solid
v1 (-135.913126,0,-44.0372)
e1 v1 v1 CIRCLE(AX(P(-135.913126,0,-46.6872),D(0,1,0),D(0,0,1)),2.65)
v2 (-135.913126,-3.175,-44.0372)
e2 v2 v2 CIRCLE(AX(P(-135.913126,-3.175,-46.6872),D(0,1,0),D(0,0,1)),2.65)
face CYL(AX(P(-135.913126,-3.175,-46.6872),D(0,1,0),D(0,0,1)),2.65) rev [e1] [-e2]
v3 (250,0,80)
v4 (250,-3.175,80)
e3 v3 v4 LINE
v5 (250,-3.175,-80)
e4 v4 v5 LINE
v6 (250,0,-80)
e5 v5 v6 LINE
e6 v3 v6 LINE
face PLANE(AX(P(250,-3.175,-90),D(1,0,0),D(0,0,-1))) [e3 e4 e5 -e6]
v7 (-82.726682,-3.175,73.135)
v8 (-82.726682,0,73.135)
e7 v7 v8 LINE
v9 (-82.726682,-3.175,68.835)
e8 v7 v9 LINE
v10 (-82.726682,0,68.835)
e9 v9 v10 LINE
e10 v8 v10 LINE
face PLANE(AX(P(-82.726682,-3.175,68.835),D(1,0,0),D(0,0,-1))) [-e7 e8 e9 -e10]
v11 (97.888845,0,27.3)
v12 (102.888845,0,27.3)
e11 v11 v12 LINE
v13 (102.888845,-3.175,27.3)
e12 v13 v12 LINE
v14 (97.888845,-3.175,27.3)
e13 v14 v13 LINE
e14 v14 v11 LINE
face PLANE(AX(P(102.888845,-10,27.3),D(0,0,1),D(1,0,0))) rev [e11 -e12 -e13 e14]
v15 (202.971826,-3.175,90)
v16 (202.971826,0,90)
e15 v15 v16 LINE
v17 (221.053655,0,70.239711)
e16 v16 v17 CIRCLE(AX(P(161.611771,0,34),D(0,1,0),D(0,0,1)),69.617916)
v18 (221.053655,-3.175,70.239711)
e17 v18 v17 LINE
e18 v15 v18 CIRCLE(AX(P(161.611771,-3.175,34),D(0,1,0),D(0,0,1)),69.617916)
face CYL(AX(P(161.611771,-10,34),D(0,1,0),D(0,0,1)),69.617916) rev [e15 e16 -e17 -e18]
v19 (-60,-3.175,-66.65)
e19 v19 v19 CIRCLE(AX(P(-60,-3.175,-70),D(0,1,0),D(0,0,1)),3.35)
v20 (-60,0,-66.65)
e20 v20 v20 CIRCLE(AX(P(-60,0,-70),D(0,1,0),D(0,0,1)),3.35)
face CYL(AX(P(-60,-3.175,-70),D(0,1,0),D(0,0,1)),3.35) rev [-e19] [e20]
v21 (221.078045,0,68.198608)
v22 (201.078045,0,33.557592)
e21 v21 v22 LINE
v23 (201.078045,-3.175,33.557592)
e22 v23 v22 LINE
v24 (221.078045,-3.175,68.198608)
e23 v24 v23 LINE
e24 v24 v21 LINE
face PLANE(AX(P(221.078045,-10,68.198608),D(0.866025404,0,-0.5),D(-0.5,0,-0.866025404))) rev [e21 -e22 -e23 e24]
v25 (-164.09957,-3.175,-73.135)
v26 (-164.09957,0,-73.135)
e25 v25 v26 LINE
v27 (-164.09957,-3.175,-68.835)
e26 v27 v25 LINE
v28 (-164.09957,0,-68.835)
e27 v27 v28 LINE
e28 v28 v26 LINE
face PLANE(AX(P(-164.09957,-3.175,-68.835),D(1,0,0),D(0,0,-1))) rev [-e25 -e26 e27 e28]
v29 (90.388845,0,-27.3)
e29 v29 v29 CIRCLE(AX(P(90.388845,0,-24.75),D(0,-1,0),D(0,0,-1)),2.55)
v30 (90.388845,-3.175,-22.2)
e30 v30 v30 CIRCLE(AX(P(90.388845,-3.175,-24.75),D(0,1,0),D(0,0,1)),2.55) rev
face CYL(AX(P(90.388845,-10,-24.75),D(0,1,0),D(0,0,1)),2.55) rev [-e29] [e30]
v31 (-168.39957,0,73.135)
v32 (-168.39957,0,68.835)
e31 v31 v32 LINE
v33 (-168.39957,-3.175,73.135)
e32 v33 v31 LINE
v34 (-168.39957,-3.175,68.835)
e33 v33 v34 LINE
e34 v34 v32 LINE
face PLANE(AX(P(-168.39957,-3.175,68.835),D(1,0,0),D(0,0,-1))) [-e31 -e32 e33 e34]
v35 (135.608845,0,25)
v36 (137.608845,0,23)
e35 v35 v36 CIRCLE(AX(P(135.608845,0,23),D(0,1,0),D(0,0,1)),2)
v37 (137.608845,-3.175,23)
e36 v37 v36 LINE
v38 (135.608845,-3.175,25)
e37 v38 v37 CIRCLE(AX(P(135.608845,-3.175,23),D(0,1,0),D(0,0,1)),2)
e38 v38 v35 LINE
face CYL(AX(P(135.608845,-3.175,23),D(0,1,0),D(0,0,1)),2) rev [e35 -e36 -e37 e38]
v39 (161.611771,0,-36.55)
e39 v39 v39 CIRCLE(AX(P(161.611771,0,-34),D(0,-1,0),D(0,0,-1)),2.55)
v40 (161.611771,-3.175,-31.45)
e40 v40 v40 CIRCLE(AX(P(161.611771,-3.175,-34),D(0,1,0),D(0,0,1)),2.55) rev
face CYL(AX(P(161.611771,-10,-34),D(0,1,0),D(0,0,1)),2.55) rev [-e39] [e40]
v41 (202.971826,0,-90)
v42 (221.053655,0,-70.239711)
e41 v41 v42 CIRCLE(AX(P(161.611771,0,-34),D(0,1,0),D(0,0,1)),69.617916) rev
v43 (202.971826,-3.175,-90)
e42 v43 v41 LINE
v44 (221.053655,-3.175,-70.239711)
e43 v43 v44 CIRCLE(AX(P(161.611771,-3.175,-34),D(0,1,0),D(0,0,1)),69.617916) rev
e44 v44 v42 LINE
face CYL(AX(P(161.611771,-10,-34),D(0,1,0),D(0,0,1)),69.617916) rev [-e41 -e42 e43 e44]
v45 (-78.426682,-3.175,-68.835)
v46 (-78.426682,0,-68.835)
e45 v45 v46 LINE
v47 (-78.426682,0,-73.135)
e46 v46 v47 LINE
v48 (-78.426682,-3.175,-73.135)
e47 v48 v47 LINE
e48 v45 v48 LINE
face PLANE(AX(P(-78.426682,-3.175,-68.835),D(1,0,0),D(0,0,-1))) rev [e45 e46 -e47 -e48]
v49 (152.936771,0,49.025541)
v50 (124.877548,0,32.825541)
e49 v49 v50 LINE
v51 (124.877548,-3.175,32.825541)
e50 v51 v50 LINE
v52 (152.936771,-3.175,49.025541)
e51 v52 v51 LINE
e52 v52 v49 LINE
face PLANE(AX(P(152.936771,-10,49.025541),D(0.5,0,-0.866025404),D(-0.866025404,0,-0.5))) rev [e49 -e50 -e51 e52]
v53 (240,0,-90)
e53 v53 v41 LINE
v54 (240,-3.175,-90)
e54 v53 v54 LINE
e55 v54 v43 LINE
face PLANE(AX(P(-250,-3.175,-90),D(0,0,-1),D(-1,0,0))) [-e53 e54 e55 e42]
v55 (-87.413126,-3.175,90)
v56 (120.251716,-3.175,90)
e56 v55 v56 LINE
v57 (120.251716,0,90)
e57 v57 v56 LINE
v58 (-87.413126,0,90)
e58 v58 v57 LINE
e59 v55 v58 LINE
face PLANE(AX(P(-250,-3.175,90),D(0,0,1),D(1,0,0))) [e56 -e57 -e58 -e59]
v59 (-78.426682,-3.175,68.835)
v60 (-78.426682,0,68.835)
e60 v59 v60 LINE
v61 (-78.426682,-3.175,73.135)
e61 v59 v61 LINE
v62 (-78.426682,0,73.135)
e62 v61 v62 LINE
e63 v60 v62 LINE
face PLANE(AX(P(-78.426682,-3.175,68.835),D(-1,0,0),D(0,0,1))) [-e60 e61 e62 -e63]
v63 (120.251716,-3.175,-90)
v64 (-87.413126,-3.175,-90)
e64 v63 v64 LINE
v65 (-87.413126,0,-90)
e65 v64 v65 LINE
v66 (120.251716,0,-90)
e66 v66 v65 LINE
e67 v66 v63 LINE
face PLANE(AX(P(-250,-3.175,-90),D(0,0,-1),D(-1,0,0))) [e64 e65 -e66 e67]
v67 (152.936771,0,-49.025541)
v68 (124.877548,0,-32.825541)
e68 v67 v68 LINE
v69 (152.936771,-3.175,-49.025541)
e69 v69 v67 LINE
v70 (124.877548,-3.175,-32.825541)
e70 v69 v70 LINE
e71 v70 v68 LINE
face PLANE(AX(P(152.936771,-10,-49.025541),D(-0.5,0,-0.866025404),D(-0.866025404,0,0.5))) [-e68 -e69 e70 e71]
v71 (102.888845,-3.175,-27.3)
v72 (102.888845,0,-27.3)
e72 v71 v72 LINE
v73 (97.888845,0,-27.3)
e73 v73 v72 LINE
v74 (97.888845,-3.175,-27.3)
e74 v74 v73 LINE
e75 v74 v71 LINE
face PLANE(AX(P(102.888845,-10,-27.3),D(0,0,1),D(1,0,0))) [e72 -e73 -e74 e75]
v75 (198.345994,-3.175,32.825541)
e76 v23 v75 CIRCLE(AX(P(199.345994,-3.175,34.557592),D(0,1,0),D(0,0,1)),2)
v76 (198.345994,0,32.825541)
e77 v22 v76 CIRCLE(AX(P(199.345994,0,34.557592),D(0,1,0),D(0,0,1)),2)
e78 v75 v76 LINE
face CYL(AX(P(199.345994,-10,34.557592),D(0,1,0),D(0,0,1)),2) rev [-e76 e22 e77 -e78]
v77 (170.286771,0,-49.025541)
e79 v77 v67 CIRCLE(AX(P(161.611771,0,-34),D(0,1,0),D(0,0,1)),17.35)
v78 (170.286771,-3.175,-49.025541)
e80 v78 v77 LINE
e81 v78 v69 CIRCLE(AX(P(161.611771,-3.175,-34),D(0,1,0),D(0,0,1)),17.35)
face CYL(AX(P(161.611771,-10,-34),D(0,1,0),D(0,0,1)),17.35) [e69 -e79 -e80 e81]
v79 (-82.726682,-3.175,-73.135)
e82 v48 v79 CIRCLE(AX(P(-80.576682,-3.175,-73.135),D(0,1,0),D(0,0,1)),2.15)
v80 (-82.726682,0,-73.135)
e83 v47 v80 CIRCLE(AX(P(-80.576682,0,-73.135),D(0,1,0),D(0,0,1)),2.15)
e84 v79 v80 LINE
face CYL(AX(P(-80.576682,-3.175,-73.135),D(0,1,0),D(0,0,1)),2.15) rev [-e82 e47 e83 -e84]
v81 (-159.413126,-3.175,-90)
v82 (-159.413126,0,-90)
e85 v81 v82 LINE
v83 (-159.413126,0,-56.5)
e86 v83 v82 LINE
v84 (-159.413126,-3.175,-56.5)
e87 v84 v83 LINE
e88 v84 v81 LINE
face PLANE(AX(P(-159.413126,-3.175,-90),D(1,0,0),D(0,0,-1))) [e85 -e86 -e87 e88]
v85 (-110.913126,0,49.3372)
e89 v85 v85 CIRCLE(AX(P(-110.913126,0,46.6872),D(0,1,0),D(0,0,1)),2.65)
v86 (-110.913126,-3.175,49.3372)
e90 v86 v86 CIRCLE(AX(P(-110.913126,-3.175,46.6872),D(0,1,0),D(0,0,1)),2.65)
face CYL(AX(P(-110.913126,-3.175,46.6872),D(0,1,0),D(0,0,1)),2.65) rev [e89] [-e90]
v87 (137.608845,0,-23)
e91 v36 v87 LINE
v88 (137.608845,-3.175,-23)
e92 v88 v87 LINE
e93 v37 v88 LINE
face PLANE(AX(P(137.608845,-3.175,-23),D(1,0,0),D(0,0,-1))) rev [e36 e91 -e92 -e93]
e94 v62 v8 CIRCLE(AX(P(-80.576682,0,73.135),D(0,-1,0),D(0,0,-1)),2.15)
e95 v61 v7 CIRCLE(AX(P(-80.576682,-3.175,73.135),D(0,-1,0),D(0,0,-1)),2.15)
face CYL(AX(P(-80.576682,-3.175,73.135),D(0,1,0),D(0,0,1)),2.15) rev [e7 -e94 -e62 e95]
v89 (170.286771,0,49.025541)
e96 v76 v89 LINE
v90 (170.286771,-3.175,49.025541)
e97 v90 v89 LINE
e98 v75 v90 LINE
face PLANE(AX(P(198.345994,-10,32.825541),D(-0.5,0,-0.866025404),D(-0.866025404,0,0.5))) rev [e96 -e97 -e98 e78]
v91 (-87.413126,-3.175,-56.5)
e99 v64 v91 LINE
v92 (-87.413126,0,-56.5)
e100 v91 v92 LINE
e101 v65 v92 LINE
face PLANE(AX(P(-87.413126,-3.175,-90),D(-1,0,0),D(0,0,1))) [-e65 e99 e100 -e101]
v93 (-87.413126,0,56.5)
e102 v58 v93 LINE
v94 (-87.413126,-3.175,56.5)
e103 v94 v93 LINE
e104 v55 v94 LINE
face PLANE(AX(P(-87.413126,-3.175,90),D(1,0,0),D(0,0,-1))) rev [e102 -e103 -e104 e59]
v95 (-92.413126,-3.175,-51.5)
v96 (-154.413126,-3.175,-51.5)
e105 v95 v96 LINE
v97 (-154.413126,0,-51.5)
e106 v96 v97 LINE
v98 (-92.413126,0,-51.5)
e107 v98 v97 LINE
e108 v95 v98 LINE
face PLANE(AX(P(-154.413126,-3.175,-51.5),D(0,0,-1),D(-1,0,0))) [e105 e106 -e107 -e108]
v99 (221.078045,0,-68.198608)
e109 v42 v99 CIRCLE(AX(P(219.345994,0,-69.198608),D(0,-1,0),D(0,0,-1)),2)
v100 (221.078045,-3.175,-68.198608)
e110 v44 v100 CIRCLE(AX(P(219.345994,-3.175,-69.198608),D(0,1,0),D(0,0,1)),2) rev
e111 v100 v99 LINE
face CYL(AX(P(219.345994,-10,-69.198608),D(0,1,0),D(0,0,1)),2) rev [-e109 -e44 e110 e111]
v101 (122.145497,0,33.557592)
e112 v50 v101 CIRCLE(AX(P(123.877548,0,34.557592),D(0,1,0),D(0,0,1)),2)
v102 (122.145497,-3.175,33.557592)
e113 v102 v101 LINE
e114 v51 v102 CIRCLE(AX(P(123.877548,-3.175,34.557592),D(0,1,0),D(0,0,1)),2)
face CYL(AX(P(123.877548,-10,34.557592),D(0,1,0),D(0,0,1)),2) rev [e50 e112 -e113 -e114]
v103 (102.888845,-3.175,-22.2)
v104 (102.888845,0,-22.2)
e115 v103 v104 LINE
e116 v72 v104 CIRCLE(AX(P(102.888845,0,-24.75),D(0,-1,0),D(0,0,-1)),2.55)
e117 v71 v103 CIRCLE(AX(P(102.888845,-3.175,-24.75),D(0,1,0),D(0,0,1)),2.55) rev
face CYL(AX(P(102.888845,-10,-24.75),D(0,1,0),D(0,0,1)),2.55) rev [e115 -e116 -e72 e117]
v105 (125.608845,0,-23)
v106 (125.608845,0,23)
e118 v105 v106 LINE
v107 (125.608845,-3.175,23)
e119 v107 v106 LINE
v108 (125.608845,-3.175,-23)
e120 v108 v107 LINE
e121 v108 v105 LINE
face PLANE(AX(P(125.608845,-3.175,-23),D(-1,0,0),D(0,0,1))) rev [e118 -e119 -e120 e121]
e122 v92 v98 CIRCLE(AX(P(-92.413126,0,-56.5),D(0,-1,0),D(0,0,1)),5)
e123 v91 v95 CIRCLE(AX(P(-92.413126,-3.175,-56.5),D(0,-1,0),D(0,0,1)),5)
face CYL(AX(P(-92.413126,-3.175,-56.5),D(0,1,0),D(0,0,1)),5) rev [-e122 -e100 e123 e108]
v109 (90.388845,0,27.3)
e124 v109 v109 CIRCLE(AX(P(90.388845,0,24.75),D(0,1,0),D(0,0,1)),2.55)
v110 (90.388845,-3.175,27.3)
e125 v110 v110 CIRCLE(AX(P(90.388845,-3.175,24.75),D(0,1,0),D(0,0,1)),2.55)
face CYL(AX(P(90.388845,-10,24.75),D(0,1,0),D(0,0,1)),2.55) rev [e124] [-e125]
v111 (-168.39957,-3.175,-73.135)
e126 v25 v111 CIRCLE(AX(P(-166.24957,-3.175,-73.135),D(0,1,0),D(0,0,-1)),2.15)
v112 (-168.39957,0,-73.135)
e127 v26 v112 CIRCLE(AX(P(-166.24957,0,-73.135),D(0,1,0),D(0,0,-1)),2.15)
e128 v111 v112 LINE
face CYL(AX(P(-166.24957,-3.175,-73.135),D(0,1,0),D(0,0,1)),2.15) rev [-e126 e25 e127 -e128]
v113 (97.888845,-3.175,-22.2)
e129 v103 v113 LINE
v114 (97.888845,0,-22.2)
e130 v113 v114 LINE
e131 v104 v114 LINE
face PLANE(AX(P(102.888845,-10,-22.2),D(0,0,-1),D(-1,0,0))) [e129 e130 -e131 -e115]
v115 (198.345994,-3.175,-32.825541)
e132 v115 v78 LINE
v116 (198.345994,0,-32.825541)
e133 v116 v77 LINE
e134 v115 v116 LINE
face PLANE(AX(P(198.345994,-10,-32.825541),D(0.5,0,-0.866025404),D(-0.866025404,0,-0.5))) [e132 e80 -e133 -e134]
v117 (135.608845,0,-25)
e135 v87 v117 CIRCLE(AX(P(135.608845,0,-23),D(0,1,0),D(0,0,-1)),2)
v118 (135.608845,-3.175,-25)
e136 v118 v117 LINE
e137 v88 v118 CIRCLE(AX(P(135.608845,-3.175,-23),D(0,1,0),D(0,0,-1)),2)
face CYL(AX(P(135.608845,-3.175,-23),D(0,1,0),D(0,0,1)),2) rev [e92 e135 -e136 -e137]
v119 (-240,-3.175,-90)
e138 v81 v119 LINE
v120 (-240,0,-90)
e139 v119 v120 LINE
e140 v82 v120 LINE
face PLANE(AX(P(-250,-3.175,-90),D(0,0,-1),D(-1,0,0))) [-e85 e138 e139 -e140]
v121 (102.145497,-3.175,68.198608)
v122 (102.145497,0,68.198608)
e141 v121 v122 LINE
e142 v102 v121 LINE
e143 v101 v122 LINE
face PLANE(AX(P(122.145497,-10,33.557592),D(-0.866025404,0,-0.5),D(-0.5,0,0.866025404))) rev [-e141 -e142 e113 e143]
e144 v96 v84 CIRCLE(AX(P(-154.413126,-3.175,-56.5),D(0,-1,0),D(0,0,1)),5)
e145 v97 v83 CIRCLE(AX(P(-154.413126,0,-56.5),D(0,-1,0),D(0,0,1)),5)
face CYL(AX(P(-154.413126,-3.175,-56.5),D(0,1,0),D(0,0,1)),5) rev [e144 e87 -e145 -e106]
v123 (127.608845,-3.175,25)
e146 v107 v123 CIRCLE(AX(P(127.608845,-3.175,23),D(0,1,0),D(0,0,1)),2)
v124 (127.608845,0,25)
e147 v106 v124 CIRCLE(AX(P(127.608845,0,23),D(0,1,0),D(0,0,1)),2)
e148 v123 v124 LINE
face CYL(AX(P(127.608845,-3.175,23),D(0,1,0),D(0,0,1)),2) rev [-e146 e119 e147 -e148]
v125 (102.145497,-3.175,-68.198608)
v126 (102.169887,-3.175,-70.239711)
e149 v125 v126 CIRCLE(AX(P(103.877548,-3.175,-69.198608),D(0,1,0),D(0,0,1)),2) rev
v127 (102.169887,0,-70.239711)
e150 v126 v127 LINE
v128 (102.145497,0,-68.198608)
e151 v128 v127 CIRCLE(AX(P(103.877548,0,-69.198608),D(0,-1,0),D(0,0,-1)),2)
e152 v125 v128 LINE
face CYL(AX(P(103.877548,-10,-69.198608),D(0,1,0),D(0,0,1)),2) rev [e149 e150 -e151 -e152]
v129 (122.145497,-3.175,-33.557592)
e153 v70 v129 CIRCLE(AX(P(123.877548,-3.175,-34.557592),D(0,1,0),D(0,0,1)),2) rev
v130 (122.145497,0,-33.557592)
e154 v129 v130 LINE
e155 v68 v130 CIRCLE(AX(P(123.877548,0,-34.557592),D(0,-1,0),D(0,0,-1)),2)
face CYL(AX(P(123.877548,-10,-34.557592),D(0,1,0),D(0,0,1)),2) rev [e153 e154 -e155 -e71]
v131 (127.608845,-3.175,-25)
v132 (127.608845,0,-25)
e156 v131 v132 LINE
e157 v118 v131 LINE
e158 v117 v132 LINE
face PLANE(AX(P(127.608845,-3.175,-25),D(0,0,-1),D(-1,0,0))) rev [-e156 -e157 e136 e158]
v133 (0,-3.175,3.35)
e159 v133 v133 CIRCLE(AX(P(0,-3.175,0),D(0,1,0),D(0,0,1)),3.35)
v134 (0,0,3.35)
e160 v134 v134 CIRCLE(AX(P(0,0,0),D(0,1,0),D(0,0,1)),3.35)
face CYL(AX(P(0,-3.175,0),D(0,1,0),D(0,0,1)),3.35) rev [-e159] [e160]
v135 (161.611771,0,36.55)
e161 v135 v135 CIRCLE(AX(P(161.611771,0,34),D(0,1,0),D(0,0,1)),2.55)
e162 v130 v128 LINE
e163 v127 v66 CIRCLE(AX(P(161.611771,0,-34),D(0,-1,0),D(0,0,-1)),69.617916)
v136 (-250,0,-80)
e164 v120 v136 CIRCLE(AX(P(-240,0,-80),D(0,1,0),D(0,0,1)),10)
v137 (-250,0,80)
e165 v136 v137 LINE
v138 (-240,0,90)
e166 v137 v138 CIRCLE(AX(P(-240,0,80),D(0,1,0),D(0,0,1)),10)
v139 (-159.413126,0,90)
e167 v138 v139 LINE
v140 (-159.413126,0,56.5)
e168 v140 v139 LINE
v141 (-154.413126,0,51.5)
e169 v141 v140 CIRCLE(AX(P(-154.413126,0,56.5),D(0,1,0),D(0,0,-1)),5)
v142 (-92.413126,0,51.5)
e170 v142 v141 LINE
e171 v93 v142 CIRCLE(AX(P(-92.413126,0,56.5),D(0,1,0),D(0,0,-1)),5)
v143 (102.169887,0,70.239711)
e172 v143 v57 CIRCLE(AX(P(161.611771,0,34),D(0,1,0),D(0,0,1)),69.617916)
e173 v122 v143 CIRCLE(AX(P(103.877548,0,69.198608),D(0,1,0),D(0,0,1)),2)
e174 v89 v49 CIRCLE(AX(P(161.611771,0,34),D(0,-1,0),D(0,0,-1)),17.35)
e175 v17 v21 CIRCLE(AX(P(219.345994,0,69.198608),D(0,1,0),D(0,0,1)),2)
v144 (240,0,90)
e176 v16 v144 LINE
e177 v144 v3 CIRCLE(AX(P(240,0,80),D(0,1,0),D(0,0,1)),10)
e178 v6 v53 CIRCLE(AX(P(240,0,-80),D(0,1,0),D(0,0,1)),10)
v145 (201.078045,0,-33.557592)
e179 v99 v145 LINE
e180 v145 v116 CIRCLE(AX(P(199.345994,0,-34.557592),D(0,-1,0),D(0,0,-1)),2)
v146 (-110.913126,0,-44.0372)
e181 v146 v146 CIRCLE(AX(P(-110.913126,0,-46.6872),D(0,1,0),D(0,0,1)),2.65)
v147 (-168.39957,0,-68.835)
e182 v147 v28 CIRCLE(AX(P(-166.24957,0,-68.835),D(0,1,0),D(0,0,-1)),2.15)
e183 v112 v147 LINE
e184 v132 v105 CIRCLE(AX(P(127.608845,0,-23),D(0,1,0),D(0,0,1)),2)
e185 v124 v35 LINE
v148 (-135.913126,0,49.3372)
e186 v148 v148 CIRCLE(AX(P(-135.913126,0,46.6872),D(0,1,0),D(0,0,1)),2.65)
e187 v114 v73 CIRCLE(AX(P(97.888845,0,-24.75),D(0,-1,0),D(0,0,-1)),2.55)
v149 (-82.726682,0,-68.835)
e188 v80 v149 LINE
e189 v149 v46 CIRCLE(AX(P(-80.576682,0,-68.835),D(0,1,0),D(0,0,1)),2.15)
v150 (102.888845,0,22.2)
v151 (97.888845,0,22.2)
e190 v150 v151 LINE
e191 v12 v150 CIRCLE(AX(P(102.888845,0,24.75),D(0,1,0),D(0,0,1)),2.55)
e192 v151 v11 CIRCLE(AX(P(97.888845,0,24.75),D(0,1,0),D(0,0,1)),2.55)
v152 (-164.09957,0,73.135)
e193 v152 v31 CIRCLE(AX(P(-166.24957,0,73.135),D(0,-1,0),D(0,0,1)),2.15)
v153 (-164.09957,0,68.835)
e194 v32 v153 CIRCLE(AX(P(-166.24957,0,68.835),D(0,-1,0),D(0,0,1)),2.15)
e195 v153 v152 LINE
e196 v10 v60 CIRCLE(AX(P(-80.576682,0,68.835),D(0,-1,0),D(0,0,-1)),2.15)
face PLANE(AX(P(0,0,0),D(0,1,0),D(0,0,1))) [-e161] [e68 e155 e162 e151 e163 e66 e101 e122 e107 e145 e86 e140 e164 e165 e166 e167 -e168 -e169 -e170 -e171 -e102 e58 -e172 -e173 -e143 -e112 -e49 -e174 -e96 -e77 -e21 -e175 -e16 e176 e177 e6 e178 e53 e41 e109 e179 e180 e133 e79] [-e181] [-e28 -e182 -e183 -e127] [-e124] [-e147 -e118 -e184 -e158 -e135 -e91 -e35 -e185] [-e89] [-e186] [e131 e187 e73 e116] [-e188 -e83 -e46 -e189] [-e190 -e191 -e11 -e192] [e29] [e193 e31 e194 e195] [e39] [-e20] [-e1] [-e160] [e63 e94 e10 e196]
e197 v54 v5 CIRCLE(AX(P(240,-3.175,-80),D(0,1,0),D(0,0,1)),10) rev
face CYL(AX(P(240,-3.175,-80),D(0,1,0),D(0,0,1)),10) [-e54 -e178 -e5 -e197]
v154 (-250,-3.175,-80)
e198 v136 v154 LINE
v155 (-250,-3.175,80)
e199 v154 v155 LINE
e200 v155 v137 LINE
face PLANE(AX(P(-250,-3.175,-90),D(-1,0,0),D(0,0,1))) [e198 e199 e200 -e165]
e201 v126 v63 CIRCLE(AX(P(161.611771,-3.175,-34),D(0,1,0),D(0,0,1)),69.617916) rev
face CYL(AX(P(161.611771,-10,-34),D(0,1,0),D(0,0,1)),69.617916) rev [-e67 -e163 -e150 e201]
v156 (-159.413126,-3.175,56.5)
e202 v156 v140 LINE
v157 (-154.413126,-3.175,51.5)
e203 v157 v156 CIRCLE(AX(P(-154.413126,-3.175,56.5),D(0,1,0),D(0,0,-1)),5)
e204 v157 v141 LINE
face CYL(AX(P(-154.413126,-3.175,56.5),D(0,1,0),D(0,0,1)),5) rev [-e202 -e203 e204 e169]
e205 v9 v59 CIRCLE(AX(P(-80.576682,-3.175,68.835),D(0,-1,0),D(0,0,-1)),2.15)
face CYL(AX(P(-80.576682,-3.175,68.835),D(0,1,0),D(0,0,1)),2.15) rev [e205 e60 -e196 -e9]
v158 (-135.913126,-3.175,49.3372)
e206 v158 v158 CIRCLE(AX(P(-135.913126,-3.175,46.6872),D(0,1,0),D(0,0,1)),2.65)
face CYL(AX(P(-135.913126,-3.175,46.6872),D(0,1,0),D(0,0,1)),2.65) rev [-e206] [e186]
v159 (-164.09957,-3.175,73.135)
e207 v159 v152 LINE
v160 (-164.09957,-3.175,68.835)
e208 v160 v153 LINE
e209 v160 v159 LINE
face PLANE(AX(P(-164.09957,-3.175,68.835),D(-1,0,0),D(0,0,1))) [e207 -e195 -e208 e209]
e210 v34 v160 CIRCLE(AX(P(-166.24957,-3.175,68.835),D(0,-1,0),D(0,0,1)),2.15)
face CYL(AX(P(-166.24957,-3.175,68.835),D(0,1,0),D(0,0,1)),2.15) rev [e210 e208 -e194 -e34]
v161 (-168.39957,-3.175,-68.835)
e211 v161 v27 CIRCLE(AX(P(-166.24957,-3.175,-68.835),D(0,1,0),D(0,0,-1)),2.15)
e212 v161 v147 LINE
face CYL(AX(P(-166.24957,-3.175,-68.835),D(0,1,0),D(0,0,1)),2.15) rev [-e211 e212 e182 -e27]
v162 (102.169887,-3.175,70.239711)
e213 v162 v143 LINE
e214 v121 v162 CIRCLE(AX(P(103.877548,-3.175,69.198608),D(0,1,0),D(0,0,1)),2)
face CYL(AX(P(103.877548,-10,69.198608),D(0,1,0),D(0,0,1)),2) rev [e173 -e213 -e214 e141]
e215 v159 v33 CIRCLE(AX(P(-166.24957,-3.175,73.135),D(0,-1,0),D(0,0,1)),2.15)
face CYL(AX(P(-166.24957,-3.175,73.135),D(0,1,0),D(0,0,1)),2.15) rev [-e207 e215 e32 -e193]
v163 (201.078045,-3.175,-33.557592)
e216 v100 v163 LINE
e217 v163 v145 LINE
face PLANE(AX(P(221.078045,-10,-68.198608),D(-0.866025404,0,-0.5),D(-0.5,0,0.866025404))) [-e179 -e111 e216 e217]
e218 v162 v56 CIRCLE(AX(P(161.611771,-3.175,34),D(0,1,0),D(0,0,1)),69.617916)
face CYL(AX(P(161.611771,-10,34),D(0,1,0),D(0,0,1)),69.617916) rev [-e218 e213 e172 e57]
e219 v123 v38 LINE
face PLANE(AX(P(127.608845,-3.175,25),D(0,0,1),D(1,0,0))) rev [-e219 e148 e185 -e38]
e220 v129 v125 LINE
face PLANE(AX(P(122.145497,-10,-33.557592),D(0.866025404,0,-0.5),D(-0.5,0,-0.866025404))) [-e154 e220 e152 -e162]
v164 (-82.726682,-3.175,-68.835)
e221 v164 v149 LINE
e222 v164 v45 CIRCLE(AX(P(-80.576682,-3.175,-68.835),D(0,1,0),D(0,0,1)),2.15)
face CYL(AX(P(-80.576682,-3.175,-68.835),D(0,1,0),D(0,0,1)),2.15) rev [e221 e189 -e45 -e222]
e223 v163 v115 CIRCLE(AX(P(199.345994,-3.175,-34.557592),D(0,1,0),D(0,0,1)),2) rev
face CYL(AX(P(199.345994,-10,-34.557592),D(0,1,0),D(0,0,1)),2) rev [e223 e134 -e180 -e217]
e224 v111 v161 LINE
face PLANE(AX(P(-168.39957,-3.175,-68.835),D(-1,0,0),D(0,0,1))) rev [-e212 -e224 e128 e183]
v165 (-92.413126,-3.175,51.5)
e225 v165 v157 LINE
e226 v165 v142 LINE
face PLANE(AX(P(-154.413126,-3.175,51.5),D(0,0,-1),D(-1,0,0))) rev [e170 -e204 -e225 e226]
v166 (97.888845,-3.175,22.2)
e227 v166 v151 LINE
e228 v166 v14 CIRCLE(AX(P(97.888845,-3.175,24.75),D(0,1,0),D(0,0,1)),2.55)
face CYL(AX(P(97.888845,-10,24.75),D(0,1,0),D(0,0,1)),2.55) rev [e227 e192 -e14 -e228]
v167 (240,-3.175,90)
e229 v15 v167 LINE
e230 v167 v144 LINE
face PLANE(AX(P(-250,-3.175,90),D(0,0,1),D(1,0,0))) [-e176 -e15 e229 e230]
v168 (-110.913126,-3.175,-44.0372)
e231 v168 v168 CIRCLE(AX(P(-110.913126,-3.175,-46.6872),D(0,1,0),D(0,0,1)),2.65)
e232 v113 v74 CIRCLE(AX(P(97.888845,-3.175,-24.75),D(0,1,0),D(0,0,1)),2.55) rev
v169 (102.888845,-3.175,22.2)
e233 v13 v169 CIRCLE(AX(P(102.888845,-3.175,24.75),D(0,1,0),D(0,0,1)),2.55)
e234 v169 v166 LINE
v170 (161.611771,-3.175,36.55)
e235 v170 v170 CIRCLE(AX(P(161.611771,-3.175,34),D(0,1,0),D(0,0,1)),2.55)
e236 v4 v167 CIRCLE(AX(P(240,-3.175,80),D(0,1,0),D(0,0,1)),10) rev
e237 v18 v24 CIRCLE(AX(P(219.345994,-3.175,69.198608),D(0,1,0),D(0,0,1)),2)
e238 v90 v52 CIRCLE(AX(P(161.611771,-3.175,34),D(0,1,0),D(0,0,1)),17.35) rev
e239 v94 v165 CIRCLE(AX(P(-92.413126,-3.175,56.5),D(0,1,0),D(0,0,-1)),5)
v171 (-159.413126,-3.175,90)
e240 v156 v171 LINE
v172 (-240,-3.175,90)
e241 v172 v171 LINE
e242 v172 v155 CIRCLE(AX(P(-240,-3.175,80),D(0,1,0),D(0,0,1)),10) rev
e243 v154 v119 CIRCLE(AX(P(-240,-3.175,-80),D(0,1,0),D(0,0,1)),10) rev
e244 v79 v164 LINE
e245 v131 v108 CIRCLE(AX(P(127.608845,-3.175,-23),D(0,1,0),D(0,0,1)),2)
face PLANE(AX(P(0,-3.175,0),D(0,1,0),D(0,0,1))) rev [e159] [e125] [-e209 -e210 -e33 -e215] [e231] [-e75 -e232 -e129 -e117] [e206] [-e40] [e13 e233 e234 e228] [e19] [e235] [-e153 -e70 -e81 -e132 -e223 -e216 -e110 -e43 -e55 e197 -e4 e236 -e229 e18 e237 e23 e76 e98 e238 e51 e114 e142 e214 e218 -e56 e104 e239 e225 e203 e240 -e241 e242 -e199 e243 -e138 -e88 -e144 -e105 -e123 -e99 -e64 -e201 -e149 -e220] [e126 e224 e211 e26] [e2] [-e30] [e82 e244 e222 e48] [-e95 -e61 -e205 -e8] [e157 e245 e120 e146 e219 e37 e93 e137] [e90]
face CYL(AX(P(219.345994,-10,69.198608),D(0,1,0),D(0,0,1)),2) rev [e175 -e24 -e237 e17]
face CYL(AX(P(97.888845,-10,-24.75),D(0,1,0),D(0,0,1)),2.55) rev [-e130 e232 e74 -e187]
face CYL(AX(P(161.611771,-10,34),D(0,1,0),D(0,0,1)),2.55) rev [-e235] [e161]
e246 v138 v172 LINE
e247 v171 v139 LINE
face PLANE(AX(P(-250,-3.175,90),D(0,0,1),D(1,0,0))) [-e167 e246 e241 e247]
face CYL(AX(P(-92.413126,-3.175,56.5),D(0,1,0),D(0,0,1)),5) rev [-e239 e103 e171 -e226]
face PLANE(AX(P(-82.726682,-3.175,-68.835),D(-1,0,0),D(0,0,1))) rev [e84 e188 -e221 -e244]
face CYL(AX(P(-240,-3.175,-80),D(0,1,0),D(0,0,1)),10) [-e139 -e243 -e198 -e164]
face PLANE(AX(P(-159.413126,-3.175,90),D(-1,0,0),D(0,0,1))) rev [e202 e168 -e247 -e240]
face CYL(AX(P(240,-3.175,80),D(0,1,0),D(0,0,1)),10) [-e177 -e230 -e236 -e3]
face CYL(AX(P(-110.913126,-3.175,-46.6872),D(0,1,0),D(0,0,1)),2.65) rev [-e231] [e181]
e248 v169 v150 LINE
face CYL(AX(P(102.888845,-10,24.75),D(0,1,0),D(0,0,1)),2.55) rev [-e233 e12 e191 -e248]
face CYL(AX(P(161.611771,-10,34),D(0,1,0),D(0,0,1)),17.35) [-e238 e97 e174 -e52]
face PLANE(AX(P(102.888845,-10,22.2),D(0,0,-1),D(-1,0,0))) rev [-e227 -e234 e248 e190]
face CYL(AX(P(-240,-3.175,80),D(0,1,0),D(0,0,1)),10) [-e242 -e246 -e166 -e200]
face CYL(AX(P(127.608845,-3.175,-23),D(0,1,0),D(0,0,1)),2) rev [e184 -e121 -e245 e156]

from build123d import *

# Parameters (mm, degrees)
SKETCH1_W           = 500
SKETCH1_H           = 180
BASE_FLANGE1_DEPTH  = 3.175
FILLET1_R           = 10
SKETCH13_R          = 2.65
CUT_EXTRUDE4_DEPTH  = 266.725573901
CUT_EXTRUDE5_DEPTH  = 266.725573901
CUT_EXTRUDE6_DEPTH  = 266.725573901
SKETCH21_R          = 2.55
CUT_EXTRUDE7_DEPTH  = 10
CUT_EXTRUDE8_DEPTH  = 266.725573901
SKETCH26_R          = 3.35
CUT_EXTRUDE9_DEPTH  = 266.725573901
SKETCH27_R          = 3.35
CUT_EXTRUDE10_DEPTH = 266.725573901


# Sheet-metal steps are written as plain solids
with BuildPart() as part:
    # Sketch1 → Base-Flange1 (new body)
    with BuildSketch(Plane(origin=(0, 0, 0), x_dir=(1, 0, 0), z_dir=(0, 1, 0))):
        Rectangle(SKETCH1_W, SKETCH1_H)
    extrude(amount=-BASE_FLANGE1_DEPTH)

    # Fillet1
    fillet1_edges = [part.edges().sort_by_distance(p)[0] for p in [
        (250, -1.5875, 90),
        (-250, -1.5875, 90),
        (-250, -1.5875, -90),
        (250, -1.5875, -90),
    ]]
    fillet(fillet1_edges, radius=FILLET1_R)

    # Sketch13 → Cut-Extrude4 (cut, through all)
    with BuildSketch(Plane(origin=(0, 0, 0), x_dir=(1, 0, 0), z_dir=(0, 1, 0))):
        with Locations(Location((-135.913126074, 46.6872, 0), (0, 0, 270))):
            Circle(SKETCH13_R)
        with Locations(Location((-135.913126074, -46.6872, 0), (0, 0, 270))):
            Circle(SKETCH13_R)
        with Locations(Location((-110.913126074, -46.6872, 0), (0, 0, 270))):
            Circle(SKETCH13_R)
        with Locations(Location((-110.913126074, 46.6872, 0), (0, 0, 270))):
            Circle(SKETCH13_R)
    extrude(amount=-CUT_EXTRUDE4_DEPTH, mode=Mode.SUBTRACT)

    # Sketch15 → Cut-Extrude5 (cut, through all)
    with BuildSketch(Plane(origin=(0, 0, 0), x_dir=(1, 0, 0), z_dir=(0, 1, 0))):
        with BuildLine():
            Line((-159.413126074, -90), (-87.413126074, -90))
            Line((-87.413126074, -90), (-87.413126074, -56.5))
            ThreePointArc((-87.413126074, -56.5), (-88.877592168, -52.964466094), (-92.413126074, -51.5))
            Line((-92.413126074, -51.5), (-154.413126074, -51.5))
            ThreePointArc((-154.413126074, -51.5), (-157.94865998, -52.964466094), (-159.413126074, -56.5))
            Line((-159.413126074, -56.5), (-159.413126074, -90))
        make_face()
    cut_extrude5 = extrude(amount=-CUT_EXTRUDE5_DEPTH, mode=Mode.SUBTRACT)

    # Mirror1: Cut-Extrude5 across plane
    add(cut_extrude5.mirror(Plane.XY), mode=Mode.SUBTRACT)

    # Sketch16 → Cut-Extrude6 (cut, through all)
    with BuildSketch(Plane(origin=(0, 0, 0), x_dir=(1, 0, 0), z_dir=(0, 1, 0))):
        with BuildLine():
            Line((-82.726681877, 68.835), (-82.726681877, 73.135))
            ThreePointArc((-82.726681877, 73.135), (-80.576681877, 75.285), (-78.426681877, 73.135))
            Line((-78.426681877, 73.135), (-78.426681877, 68.835))
            ThreePointArc((-78.426681877, 68.835), (-80.576681877, 66.685), (-82.726681877, 68.835))
        make_face()
        with BuildLine():
            Line((-164.09957027, 68.835), (-164.09957027, 73.135))
            ThreePointArc((-164.09957027, 73.135), (-166.24957027, 75.285), (-168.39957027, 73.135))
            Line((-168.39957027, 73.135), (-168.39957027, 68.835))
            ThreePointArc((-168.39957027, 68.835), (-166.24957027, 66.685), (-164.09957027, 68.835))
        make_face()
    cut_extrude6 = extrude(amount=-CUT_EXTRUDE6_DEPTH, mode=Mode.SUBTRACT)

    # Sketch21 → Cut-Extrude7 (cut)
    with BuildSketch(Plane(origin=(0, 0, 0), x_dir=(1, 0, 0), z_dir=(0, 1, 0))):
        with Locations(Location((90.388844999, -24.75, 0), (0, 0, 270))):
            Circle(SKETCH21_R)
        with Locations(Location((161.611770889, -34, 0), (0, 0, 270))):
            Circle(SKETCH21_R)
        with BuildLine():
            Line((102.888844999, -27.3), (97.888844999, -27.3))
            ThreePointArc((97.888844999, -27.3), (95.338844999, -24.75), (97.888844999, -22.2))
            Line((97.888844999, -22.2), (102.888844999, -22.2))
            ThreePointArc((102.888844999, -22.2), (105.438844999, -24.75), (102.888844999, -27.3))
        make_face()
        with BuildLine():
            Line((122.145496999, -33.557591563), (102.145496999, -68.198607715))
            ThreePointArc((102.145496999, -68.198607715), (101.877690583, -69.222505113), (102.169887266, -70.239710725))
            ThreePointArc((102.169887266, -70.239710725), (161.611770889, -103.617915525), (221.053654512, -70.239710725))
            ThreePointArc((221.053654512, -70.239710725), (221.345851195, -69.222505113), (221.07804478, -68.198607715))
            Line((221.07804478, -68.198607715), (201.07804478, -33.557591563))
            ThreePointArc((201.07804478, -33.557591563), (199.863632062, -32.625739911), (198.345993972, -32.825540756))
            Line((198.345993972, -32.825540756), (170.286770889, -49.025540756))
            ThreePointArc((170.286770889, -49.025540756), (161.611770889, -51.35), (152.936770889, -49.025540756))
            Line((152.936770889, -49.025540756), (124.877547807, -32.825540756))
            ThreePointArc((124.877547807, -32.825540756), (123.359909716, -32.625739911), (122.145496999, -33.557591563))
        make_face()
    cut_extrude7 = extrude(amount=-CUT_EXTRUDE7_DEPTH, mode=Mode.SUBTRACT)

    # Mirror2: Cut-Extrude7 across plane
    add(cut_extrude7.mirror(Plane.XY), mode=Mode.SUBTRACT)

    # Mirror3: Cut-Extrude6 across plane
    add(cut_extrude6.mirror(Plane.XY), mode=Mode.SUBTRACT)

    # Sketch25 → Cut-Extrude8 (cut, through all)
    with BuildSketch(Plane(origin=(0, 0, 0), x_dir=(1, 0, 0), z_dir=(0, 1, 0))):
        with BuildLine():
            Line((127.608844999, 25), (135.608844999, 25))
            ThreePointArc((135.608844999, 25), (137.023058561, 24.414213562), (137.608844999, 23))
            Line((137.608844999, 23), (137.608844999, -23))
            ThreePointArc((137.608844999, -23), (137.023058561, -24.414213562), (135.608844999, -25))
            Line((135.608844999, -25), (127.608844999, -25))
            ThreePointArc((127.608844999, -25), (126.194631437, -24.414213562), (125.608844999, -23))
            Line((125.608844999, -23), (125.608844999, 23))
            ThreePointArc((125.608844999, 23), (126.194631437, 24.414213562), (127.608844999, 25))
        make_face()
    extrude(amount=-CUT_EXTRUDE8_DEPTH, mode=Mode.SUBTRACT)

    # Sketch26 → Cut-Extrude9 (cut, through all)
    with BuildSketch(Plane(origin=(0, 0, 0), x_dir=(1, 0, 0), z_dir=(0, 1, 0))):
        with Locations(Location((0, 0, 0), (0, 0, 270))):
            Circle(SKETCH26_R)
    extrude(amount=-CUT_EXTRUDE9_DEPTH, mode=Mode.SUBTRACT)

    # Sketch27 → Cut-Extrude10 (cut, through all)
    with BuildSketch(Plane(origin=(0, 0, 0), x_dir=(1, 0, 0), z_dir=(0, 1, 0))):
        with Locations(Location((-60, 70, 0), (0, 0, 270))):
            Circle(SKETCH27_R)
    extrude(amount=-CUT_EXTRUDE10_DEPTH, mode=Mode.SUBTRACT)


solid = part.part
